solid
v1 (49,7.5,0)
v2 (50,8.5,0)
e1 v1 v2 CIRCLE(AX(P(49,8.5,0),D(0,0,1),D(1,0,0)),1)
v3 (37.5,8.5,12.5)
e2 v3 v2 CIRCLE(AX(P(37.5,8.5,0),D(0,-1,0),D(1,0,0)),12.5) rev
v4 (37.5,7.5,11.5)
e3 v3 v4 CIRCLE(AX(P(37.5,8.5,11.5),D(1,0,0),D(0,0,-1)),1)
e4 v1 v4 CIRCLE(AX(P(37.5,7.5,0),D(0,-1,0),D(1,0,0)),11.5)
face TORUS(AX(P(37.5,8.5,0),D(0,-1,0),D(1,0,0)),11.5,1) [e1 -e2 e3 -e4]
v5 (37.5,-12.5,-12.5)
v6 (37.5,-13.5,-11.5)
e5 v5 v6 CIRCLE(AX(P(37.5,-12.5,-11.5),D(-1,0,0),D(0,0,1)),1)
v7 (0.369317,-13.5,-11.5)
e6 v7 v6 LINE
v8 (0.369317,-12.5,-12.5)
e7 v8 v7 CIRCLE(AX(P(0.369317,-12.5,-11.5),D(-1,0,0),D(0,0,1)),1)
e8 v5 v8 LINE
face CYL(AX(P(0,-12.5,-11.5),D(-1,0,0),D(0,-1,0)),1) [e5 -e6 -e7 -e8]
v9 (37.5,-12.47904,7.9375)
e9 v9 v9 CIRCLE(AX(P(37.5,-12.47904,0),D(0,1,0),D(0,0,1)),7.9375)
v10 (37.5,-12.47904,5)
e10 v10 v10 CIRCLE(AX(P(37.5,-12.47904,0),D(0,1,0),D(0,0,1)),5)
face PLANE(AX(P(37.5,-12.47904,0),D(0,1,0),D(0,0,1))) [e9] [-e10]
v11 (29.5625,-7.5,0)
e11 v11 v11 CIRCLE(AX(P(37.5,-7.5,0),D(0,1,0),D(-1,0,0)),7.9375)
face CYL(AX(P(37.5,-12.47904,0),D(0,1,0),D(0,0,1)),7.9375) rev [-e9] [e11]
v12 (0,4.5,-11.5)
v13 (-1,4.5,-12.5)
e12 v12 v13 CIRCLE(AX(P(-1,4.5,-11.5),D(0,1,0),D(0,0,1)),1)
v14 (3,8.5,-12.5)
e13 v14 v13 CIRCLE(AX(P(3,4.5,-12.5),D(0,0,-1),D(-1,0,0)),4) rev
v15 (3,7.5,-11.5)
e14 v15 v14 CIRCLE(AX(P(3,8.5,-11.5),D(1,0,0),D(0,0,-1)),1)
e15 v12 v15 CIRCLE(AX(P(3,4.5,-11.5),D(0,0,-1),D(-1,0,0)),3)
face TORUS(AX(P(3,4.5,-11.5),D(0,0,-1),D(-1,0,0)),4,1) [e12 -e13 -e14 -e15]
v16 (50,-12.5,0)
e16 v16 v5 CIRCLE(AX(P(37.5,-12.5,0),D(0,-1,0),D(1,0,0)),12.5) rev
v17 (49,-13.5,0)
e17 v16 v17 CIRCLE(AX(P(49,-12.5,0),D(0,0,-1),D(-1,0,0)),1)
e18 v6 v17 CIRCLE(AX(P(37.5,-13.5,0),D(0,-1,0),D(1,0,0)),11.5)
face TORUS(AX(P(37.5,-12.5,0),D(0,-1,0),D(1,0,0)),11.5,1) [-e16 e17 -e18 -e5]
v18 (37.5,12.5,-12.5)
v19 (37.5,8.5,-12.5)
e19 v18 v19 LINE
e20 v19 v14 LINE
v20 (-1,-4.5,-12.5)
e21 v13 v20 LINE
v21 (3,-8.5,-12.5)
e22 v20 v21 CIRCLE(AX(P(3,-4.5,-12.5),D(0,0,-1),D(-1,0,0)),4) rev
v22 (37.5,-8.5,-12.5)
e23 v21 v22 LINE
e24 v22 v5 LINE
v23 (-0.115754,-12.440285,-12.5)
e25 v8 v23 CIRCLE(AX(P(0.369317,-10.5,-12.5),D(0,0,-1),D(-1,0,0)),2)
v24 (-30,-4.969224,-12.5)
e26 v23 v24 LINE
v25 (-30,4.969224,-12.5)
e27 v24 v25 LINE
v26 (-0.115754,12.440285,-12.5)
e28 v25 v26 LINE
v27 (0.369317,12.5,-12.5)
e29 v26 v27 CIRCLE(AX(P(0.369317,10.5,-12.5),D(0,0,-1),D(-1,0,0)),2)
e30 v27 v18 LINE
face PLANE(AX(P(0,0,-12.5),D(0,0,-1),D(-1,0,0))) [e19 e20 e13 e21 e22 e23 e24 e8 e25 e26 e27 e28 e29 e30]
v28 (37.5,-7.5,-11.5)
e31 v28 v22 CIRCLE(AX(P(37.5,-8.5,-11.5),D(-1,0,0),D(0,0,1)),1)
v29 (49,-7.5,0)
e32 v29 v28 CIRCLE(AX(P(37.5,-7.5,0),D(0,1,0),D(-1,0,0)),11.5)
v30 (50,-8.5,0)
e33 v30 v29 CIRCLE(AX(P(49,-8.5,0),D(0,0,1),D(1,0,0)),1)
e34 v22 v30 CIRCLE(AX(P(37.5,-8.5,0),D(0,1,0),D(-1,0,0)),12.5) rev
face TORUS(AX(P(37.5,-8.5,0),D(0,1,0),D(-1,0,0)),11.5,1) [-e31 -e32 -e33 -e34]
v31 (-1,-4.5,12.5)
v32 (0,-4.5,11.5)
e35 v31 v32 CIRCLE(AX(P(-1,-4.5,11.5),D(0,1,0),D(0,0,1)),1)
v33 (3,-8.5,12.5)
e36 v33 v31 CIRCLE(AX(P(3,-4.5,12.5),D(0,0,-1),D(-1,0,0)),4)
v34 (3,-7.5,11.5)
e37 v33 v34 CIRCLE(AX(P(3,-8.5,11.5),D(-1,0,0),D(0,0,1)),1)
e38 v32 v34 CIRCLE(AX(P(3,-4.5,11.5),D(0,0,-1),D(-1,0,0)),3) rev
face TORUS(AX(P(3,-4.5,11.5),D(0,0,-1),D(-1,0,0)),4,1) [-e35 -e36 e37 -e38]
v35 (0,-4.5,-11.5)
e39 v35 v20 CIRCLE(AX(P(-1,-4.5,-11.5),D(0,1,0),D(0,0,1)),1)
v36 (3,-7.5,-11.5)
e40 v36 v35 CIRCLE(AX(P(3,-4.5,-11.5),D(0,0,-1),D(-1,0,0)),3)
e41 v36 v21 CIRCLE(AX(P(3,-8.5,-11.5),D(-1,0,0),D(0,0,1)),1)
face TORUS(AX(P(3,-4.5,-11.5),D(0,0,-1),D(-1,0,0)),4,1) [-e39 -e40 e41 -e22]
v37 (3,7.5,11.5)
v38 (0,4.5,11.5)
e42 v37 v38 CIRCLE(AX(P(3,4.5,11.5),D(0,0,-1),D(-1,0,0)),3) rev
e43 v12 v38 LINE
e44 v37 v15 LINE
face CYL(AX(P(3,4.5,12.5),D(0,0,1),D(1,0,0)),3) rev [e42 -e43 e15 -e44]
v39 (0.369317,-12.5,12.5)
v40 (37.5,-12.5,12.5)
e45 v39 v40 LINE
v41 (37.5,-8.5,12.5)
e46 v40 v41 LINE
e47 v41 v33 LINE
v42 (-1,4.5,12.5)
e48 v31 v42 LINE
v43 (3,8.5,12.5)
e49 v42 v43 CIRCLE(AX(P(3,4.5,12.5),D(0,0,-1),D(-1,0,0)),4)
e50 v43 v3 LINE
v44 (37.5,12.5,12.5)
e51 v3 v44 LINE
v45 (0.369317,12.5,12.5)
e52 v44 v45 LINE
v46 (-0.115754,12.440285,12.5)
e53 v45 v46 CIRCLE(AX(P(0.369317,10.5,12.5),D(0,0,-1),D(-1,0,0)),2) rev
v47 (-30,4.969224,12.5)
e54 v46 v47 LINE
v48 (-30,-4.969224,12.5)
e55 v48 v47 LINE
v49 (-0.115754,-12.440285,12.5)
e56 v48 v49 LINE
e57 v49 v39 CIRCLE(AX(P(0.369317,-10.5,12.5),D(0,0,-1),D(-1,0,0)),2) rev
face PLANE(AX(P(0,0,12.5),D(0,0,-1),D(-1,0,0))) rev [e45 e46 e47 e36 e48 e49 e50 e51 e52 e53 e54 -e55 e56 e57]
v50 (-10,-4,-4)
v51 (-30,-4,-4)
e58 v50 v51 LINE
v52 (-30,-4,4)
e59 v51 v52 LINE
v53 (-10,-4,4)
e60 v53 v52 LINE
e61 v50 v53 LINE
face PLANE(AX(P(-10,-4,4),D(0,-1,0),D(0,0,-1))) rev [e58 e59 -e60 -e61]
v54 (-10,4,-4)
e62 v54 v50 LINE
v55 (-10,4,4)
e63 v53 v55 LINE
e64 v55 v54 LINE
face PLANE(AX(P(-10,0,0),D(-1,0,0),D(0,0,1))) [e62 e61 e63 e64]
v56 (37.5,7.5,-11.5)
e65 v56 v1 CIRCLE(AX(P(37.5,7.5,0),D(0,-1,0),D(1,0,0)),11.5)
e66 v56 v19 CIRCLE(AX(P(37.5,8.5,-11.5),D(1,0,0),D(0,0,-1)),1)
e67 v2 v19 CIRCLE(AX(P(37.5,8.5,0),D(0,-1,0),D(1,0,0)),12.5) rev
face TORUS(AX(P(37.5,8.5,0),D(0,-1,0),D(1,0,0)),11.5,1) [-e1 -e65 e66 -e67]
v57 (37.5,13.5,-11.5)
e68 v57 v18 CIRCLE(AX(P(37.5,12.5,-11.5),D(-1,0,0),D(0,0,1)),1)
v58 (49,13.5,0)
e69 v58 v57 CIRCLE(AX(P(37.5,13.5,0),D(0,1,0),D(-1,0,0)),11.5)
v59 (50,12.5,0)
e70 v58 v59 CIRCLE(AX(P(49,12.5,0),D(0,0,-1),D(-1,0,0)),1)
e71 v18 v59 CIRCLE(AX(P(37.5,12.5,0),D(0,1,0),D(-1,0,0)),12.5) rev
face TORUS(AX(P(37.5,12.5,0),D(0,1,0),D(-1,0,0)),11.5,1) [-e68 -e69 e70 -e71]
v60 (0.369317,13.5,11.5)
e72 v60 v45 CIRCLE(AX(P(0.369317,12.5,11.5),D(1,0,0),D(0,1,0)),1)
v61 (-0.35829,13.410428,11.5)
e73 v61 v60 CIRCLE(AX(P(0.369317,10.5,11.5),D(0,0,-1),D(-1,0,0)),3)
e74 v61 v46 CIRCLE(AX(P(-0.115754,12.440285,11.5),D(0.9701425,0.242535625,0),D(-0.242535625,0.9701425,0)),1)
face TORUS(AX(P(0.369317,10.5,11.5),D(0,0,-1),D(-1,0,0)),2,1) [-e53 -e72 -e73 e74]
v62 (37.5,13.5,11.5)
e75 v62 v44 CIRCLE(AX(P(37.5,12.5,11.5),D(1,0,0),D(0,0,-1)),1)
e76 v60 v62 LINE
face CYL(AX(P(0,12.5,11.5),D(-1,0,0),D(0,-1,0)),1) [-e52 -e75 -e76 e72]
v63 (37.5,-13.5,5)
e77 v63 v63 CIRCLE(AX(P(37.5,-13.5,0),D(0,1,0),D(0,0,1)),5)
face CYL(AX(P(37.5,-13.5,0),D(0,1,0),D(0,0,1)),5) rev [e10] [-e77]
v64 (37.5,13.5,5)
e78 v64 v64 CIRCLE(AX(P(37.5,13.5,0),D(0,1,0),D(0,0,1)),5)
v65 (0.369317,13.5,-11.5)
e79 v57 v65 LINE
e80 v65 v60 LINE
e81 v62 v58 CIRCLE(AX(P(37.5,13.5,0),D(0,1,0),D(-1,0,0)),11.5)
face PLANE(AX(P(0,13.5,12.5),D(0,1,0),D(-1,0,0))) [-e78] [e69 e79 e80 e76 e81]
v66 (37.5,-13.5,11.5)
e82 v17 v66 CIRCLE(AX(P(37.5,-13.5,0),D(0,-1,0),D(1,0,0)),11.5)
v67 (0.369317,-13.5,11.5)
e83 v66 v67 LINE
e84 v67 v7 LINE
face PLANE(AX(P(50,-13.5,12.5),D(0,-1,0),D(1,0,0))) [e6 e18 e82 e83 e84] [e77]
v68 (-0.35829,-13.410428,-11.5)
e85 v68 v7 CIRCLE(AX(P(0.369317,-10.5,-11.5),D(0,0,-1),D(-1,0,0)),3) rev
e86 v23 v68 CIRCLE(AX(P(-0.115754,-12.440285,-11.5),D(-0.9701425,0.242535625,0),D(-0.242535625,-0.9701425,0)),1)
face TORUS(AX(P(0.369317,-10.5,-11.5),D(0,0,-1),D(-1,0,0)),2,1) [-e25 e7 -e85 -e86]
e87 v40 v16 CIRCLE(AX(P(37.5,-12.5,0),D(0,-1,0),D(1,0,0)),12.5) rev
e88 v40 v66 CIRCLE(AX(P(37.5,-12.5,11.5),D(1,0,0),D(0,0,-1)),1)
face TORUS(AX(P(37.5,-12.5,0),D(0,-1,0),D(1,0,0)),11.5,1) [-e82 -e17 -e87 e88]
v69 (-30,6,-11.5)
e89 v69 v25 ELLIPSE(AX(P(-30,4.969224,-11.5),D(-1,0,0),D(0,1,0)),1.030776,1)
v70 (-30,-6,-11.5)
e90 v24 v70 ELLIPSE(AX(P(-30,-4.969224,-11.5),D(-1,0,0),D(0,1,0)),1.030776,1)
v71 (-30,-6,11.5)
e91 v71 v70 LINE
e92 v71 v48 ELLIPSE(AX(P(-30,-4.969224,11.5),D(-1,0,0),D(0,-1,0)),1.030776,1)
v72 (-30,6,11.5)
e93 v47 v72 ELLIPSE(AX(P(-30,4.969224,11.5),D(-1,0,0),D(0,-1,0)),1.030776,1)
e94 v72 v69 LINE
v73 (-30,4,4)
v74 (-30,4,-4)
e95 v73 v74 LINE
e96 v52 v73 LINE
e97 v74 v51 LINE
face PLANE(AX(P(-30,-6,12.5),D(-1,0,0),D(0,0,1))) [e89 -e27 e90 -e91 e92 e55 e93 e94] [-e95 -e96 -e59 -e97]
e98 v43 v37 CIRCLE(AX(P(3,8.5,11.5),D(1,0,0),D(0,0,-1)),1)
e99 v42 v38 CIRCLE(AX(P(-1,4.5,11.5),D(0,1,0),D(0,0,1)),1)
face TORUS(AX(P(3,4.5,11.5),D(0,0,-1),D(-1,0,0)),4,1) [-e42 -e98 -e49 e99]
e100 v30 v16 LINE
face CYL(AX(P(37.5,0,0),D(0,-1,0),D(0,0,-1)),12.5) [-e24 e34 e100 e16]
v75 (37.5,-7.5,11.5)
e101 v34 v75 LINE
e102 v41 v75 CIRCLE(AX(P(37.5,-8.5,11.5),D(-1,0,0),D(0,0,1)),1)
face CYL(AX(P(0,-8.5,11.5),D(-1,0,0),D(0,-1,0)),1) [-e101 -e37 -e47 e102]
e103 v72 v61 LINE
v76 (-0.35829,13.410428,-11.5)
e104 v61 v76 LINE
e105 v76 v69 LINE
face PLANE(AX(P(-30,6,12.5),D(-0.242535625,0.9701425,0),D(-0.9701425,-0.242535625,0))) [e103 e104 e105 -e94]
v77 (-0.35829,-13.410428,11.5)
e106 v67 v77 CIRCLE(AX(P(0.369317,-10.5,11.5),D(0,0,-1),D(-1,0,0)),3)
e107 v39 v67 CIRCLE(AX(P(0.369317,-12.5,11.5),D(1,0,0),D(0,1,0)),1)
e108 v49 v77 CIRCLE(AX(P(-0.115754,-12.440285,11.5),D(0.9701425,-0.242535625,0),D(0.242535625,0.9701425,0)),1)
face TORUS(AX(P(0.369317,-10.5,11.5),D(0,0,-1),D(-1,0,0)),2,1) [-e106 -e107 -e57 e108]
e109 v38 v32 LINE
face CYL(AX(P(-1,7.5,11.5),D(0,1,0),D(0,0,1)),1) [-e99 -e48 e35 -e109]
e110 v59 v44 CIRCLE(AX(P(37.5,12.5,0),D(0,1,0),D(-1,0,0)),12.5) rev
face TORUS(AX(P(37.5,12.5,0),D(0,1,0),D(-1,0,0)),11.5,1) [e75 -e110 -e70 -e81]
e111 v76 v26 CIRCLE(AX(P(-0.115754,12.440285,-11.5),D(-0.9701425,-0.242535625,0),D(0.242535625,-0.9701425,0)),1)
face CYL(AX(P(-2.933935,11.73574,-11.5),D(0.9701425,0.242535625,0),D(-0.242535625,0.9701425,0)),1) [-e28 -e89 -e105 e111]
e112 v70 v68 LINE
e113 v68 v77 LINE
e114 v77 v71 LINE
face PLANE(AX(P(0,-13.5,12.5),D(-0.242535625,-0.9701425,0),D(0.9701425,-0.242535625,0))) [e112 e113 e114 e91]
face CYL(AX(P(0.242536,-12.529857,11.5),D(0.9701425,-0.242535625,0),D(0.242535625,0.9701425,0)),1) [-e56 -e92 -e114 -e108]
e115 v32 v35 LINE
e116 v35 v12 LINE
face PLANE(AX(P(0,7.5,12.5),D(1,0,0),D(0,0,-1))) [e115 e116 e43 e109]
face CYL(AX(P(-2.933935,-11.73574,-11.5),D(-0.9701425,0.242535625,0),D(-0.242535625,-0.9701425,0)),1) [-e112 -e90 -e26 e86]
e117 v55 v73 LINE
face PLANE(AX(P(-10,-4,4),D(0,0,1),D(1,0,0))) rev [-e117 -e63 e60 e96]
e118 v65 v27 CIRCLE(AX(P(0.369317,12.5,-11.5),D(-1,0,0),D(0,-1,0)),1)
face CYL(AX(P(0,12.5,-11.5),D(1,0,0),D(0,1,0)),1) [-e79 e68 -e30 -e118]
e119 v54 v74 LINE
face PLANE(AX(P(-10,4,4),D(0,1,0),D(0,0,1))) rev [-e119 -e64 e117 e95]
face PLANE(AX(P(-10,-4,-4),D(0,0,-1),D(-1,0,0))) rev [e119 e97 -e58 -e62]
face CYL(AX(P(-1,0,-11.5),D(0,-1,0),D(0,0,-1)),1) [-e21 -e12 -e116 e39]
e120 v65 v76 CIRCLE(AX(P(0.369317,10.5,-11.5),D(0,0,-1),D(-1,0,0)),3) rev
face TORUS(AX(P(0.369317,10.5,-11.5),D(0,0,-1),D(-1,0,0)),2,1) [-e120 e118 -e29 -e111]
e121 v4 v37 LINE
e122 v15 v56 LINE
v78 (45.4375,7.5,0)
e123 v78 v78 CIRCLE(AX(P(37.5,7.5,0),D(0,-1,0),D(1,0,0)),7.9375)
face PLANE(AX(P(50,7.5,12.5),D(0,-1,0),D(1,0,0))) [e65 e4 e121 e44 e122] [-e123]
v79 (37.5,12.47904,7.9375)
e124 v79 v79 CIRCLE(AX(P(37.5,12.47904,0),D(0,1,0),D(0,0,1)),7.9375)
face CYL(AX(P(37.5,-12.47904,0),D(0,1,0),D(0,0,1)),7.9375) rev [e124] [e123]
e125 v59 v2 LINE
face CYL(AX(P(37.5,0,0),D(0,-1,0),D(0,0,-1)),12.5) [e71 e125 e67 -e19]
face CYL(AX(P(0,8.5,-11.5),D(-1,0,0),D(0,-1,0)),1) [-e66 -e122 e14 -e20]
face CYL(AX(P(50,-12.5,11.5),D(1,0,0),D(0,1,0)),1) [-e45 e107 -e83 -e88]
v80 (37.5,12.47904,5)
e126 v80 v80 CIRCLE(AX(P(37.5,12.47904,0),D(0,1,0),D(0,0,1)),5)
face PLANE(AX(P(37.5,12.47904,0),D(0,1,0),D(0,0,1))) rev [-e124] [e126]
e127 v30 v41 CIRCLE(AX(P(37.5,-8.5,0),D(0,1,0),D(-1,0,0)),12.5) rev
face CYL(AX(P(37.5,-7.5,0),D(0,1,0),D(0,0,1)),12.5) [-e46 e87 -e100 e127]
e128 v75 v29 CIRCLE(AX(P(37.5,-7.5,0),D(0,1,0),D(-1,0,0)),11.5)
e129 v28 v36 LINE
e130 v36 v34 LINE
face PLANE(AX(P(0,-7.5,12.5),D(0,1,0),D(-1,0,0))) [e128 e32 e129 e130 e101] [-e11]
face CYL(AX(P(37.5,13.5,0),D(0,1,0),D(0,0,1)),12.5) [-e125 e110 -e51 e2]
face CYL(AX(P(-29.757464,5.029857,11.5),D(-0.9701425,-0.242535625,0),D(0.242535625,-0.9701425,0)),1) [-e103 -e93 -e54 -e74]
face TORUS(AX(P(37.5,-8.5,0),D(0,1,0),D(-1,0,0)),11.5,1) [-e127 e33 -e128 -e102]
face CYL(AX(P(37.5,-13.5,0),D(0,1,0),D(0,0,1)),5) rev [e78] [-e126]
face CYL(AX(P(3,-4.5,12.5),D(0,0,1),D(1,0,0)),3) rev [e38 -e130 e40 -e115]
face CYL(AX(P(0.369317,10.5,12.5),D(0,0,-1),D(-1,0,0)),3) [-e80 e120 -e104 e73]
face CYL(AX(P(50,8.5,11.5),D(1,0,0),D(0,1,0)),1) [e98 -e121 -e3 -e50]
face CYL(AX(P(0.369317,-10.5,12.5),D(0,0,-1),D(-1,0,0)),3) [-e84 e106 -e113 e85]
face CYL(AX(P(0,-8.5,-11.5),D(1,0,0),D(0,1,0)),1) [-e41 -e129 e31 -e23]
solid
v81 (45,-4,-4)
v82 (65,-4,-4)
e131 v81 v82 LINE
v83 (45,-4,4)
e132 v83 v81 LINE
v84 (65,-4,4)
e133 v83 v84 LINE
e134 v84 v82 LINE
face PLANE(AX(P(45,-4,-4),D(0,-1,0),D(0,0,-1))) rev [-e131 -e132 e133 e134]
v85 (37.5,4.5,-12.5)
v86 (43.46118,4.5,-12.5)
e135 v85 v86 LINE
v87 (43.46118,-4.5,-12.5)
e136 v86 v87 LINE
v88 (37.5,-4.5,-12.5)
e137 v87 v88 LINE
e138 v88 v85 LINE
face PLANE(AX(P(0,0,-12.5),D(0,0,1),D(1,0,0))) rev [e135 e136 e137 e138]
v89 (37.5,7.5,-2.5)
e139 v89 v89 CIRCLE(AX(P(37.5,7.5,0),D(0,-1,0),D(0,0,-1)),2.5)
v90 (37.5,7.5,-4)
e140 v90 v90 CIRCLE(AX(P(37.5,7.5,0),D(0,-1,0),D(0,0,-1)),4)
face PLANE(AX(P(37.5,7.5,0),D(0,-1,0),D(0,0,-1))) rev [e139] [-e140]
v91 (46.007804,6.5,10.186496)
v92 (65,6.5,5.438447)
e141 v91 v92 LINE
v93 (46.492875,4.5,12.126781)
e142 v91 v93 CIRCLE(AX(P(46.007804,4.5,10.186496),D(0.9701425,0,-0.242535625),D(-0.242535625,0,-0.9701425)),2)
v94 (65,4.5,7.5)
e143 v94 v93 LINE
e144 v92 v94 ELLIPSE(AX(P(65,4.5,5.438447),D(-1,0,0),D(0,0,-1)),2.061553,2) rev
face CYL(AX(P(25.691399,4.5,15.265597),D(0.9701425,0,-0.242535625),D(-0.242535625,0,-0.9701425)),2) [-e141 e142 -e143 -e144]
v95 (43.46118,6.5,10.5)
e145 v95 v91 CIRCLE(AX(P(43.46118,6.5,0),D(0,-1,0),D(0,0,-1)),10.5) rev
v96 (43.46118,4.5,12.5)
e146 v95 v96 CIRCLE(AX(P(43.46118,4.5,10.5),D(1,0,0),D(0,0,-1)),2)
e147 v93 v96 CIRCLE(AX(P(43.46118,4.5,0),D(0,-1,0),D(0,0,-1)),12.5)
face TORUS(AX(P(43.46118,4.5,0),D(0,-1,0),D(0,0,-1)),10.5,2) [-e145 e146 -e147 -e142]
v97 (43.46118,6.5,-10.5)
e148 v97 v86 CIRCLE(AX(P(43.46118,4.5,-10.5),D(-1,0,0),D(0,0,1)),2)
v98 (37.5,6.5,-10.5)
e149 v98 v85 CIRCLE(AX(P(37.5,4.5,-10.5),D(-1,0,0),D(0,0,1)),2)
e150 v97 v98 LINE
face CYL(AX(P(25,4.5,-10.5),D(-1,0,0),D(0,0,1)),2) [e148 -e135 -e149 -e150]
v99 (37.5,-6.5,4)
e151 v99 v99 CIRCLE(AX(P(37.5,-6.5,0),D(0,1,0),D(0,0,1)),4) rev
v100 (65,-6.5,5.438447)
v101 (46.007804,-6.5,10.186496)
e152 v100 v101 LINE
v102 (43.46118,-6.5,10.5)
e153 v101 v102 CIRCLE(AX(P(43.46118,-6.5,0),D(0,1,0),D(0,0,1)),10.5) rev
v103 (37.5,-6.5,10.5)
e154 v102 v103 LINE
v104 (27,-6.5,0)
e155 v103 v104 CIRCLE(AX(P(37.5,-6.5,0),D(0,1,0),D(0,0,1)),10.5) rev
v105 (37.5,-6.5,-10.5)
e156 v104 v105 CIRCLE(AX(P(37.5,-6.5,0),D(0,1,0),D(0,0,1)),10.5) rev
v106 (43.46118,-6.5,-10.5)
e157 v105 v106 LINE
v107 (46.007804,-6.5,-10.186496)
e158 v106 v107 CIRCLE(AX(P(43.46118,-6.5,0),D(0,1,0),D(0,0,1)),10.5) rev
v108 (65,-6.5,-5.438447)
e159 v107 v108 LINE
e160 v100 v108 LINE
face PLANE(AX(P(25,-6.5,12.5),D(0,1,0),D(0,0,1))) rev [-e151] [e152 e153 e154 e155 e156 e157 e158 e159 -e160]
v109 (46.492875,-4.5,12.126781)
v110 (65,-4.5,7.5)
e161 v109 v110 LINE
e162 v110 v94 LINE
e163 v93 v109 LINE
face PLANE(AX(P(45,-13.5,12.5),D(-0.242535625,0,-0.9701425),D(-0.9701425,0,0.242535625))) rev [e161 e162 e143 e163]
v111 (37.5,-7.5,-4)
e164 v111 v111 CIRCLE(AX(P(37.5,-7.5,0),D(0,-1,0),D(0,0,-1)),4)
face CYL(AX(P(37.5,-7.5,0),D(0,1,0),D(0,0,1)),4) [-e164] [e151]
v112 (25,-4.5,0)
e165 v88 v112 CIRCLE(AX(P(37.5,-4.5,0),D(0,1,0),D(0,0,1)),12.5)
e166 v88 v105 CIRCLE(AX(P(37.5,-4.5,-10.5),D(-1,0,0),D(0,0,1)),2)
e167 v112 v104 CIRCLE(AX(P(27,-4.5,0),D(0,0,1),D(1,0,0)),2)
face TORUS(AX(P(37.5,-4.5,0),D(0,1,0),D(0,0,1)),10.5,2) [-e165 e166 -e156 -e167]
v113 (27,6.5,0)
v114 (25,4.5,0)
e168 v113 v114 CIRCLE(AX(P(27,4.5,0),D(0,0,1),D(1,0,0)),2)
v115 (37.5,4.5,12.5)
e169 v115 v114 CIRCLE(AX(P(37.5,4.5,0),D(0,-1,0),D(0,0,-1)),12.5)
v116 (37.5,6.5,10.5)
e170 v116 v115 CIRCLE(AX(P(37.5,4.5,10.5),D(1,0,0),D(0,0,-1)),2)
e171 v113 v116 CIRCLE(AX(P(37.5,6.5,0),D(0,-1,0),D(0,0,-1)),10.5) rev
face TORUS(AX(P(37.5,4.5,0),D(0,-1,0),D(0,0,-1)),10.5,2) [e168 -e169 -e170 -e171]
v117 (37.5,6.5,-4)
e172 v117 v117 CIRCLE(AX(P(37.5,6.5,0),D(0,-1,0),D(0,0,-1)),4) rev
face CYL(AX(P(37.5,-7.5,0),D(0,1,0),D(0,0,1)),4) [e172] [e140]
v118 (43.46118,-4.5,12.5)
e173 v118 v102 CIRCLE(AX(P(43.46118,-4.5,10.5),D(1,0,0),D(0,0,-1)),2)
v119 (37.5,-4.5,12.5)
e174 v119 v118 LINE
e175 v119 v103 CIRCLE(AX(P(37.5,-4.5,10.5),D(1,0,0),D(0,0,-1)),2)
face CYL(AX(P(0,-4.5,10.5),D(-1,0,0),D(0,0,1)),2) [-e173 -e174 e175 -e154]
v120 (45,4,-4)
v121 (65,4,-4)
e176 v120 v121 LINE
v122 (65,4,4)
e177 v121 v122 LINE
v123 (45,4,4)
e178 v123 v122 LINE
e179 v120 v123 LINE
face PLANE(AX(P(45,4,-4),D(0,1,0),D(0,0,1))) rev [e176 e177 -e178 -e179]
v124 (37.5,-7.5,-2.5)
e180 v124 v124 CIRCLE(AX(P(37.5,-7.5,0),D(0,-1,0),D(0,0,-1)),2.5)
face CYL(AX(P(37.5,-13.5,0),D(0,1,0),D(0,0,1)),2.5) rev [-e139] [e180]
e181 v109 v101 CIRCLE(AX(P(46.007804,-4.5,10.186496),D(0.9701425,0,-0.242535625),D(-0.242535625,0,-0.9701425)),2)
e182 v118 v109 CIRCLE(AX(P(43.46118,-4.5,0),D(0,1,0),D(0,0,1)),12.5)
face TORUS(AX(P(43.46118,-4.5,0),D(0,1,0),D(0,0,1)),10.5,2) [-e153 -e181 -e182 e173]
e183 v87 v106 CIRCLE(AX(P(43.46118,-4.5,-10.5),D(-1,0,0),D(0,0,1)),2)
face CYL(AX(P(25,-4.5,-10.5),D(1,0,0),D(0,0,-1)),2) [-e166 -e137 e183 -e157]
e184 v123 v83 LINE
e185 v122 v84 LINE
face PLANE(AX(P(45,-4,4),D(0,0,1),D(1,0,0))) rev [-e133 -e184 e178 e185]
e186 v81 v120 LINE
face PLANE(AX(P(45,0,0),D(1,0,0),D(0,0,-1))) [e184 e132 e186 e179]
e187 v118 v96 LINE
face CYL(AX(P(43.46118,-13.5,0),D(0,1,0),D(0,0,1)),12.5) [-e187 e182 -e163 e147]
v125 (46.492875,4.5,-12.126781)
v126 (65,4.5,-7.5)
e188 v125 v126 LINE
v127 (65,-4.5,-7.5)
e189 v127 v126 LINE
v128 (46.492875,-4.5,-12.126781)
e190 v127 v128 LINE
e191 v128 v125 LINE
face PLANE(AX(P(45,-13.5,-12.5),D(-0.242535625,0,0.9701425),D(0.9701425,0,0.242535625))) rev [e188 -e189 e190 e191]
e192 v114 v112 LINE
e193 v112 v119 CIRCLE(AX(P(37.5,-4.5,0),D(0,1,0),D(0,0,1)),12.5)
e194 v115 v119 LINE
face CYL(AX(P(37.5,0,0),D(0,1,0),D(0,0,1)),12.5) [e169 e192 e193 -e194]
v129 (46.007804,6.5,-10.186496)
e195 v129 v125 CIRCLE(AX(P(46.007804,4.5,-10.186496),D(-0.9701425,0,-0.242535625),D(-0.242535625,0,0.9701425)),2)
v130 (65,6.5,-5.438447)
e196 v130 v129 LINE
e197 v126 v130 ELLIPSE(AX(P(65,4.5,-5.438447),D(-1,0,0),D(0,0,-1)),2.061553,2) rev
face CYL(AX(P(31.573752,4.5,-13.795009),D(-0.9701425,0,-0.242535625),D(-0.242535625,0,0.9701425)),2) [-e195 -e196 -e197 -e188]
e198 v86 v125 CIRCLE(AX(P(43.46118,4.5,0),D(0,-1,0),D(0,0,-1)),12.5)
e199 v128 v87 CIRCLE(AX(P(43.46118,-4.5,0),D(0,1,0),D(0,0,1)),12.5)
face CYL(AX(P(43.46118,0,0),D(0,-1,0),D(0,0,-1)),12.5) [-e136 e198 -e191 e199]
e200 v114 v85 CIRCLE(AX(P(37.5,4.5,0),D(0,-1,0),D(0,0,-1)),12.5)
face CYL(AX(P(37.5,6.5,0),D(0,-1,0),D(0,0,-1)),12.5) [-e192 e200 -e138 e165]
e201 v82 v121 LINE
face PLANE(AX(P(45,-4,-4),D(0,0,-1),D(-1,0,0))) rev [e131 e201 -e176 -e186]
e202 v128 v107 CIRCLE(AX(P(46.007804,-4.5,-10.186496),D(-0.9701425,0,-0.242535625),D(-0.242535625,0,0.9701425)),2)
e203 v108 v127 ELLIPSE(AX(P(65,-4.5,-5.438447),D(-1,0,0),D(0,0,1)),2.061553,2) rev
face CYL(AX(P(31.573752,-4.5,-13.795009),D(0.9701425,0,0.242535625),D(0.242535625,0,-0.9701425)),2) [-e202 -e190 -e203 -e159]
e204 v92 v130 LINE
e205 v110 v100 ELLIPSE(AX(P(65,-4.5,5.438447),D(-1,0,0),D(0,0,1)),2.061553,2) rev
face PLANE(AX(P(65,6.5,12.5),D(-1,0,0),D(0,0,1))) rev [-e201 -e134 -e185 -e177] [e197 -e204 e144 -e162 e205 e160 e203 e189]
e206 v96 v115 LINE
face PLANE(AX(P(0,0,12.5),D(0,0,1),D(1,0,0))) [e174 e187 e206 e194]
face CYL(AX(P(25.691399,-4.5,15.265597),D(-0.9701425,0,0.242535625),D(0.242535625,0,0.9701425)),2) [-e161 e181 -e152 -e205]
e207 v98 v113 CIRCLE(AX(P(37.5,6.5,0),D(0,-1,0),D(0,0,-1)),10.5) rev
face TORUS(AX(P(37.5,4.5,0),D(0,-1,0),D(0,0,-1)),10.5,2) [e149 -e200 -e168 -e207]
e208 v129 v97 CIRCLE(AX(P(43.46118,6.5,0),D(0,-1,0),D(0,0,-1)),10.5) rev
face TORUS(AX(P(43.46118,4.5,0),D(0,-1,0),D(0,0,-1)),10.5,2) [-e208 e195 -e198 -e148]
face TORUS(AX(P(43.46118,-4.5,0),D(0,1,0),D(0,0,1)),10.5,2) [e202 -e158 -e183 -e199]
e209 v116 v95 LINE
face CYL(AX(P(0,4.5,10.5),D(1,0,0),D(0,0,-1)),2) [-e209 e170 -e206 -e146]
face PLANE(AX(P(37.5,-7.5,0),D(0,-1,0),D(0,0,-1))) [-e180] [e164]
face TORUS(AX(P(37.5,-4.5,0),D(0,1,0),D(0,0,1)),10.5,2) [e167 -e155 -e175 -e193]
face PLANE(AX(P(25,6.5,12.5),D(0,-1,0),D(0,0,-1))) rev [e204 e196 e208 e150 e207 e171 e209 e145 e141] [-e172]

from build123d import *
from build123d.topology import SkipClean

# Parameters (mm, degrees)
BOSS_EXTRUDE1_DEPTH     = 12.5
FILLET1_R               = 12.5
FILLET2_R               = 3
SKETCH2_W               = 8
SKETCH2_H               = 8
CUT_EXTRUDE1_DEPTH      = 20
SKETCH3_R               = 7.9375
CUT_EXTRUDE2_DEPTH      = 12.47904
CUT_EXTRUDE3_DEPTH      = 54.27757502
CUT_EXTRUDE3_DEPTH_BACK = 54.27757502
SKETCH4_R               = 5
SKETCH5_W               = 40
SKETCH5_H               = 13
BOSS_EXTRUDE2_DEPTH     = 12.5
FILLET4_R               = 12.5
CUT_EXTRUDE4_DEPTH      = 70.14658343
CUT_EXTRUDE4_DEPTH_BACK = 70.14658343
SKETCH7_R               = 2.5
SKETCH9_W               = 8
SKETCH9_H               = 8
CUT_EXTRUDE5_DEPTH      = 20
SKETCH10_R              = 4
SKETCH10_R_2            = 2.5
BOSS_EXTRUDE3_DEPTH     = 7.5
FILLET5_R               = 12.5
FILLET6_R               = 2
FILLET3_R               = 1


with BuildPart() as part:
    # Sketch1 → Boss-Extrude1 (new, symmetric)
    with BuildSketch(Plane.XY):
        Polygon((0, 13.5), (50, 13.5), (50, 7.5), (0, 7.5), (0, -7.5), (50, -7.5), (50, -13.5), (0, -13.5), (-30, -6), (-30, 6), align=None)
    extrude(amount=BOSS_EXTRUDE1_DEPTH, both=True)

    # Fillet1
    fillet1_edges = [part.edges().sort_by_distance(p)[0] for p in [
        (50, -10.5, -12.5),
        (50, -10.5, 12.5),
        (50, 10.5, -12.5),
        (50, 10.5, 12.5),
    ]]
    fillet(fillet1_edges, radius=FILLET1_R - 0.0001)  # a hair under: the kernel refuses the full size

    # Fillet2
    fillet2_edges = [part.edges().sort_by_distance(p)[0] for p in [
        (0, -13.5, 0),
        (0, -7.5, 0),
        (0, 7.5, 0),
        (0, 13.5, 0),
    ]]
    fillet(fillet2_edges, radius=FILLET2_R)

    # Sketch2 → Cut-Extrude1 (cut)
    with BuildSketch(Plane.ZY.offset(30)):
        Rectangle(SKETCH2_W, SKETCH2_H)
    extrude(amount=-CUT_EXTRUDE1_DEPTH, mode=Mode.SUBTRACT)

    # Sketch3 → Cut-Extrude2 (cut, symmetric)
    with BuildSketch(Plane(origin=(0, 0, 0), x_dir=(1, 0, 0), z_dir=(0, 1, 0))):
        with Locations(Location((37.5, 0, 0), (0, 0, 270))):
            Circle(SKETCH3_R)
    extrude(amount=CUT_EXTRUDE2_DEPTH, both=True, mode=Mode.SUBTRACT)

    # Sketch4 → Cut-Extrude3 (cut, two sides: drawn at the far end of the back side and taken through both)
    with BuildSketch(Plane(origin=(0, 0, 0), x_dir=(1, 0, 0), z_dir=(0, 1, 0)).offset(-CUT_EXTRUDE3_DEPTH_BACK)):
        with Locations(Location((37.5, 0, 0), (0, 0, 270))):
            Circle(SKETCH4_R)
    extrude(amount=CUT_EXTRUDE3_DEPTH + CUT_EXTRUDE3_DEPTH_BACK, mode=Mode.SUBTRACT)

    # Fillet3
    fillet3_edges = [part.edges().sort_by_distance(p)[0] for p in [
        (-15.179144999, 9.70521375, -12.5),
        (20.25005, 7.5, -12.5),
        (18.934708438, -13.5, -12.5),
        (18.934708438, -13.5, 12.5),
        (46.338864054, -13.5, 8.838864054),
        (46.338864054, -13.5, -8.838864054),
        (46.338864054, -7.5, 8.838864054),
        (46.338864054, -7.5, -8.838864054),
        (20.25005, 7.5, 12.5),
        (46.338864054, 7.5, 8.838864054),
        (46.338864054, 7.5, -8.838864054),
        (46.338864054, 13.5, 8.838864054),
        (46.338864054, 13.5, -8.838864054),
        (20.25005, -7.5, -12.5),
        (-15.179144999, -9.70521375, -12.5),
        (18.934708438, 13.5, -12.5),
        (0, 0, -12.5),
        (0.002767086, 13.47752267, -12.5),
        (0.002767086, -13.47752267, -12.5),
        (-15.179144999, -9.70521375, 12.5),
        (20.25005, -7.5, 12.5),
        (0, 0, 12.5),
        (18.934708438, 13.5, 12.5),
        (0.002767086, 13.47752267, 12.5),
        (0.002767086, -13.47752267, 12.5),
        (0.878679656, -6.621320344, -12.5),
        (0.878679656, -6.621320344, 12.5),
        (0.878679656, 6.621320344, -12.5),
        (0.878679656, 6.621320344, 12.5),
        (-15.179144999, 9.70521375, 12.5),
    ]]
    fillet(fillet3_edges, radius=FILLET3_R)


with BuildPart() as body_2:
    # Sketch5 → Boss-Extrude2 (new, symmetric)
    with BuildSketch(Plane.XY):
        with Locations((45, 0)):
            Rectangle(SKETCH5_W, SKETCH5_H)
    extrude(amount=BOSS_EXTRUDE2_DEPTH, both=True)

    # Fillet4
    fillet4_edges = [body_2.edges().sort_by_distance(p)[0] for p in [
        (25, 0, 12.5),
        (25, 0, -12.5),
    ]]
    fillet(fillet4_edges, radius=FILLET4_R - 0.0001)  # a hair under: the kernel refuses the full size

    # Sketch7 → Cut-Extrude4 (cut, two sides: drawn at the far end of the back side and taken through both)
    with BuildSketch(Plane(origin=(0, 6.5, 0), x_dir=(1, 0, 0), z_dir=(0, 1, 0)).offset(-CUT_EXTRUDE4_DEPTH_BACK)):
        with Locations(Location((37.5, 0, 0), (0, 0, 270))):
            Circle(SKETCH7_R)
        Polygon((45, 12.5), (65, 7.5), (65, 12.5), align=None)
        Polygon((65, -7.5), (65, -12.5), (45, -12.5), align=None)
    extrude(amount=CUT_EXTRUDE4_DEPTH + CUT_EXTRUDE4_DEPTH_BACK, mode=Mode.SUBTRACT)

    # Sketch9 → Cut-Extrude5 (cut)
    with BuildSketch(Plane(origin=(65, 0, 0), x_dir=(0, 0, -1), z_dir=(1, 0, 0))):
        Rectangle(SKETCH9_W, SKETCH9_H)
    extrude(amount=-CUT_EXTRUDE5_DEPTH, mode=Mode.SUBTRACT)

    # Sketch10 → Boss-Extrude3 (add, symmetric)
    with SkipClean():  # the faces are left unmerged after this step: merging them gives an invalid solid
        with BuildSketch(Plane.XZ):
            with Locations(Location((37.5, 0, 0), (0, 0, 270))):
                Circle(SKETCH10_R)
            with Locations(Location((37.5, 0, 0), (0, 0, 270))):
                Circle(SKETCH10_R_2, mode=Mode.SUBTRACT)
        extrude(amount=BOSS_EXTRUDE3_DEPTH, both=True)

    # Fillet5
    fillet5_edges = [body_2.edges().sort_by_distance(p)[0] for p in [
        (45, 0, -12.5),
        (45, 0, 12.5),
    ]]
    fillet(fillet5_edges, radius=FILLET5_R)

    # Fillet6
    fillet6_edges = [body_2.edges().sort_by_distance(p)[0] for p in [
        (40.48053984, -6.5, 12.5),
        (40.48053984, -6.5, -12.5),
        (28.661135946, -6.5, -8.838864054),
        (28.661135946, -6.5, 8.838864054),
        (28.661135946, 6.5, -8.838864054),
        (28.661135946, 6.5, 8.838864054),
        (55.746437496, 6.5, -9.813390626),
        (55.746437496, -6.5, 9.813390626),
        (55.746437496, 6.5, 9.813390626),
        (55.746437496, -6.5, -9.813390626),
        (44.988470476, -6.5, -12.406344459),
        (44.988470476, -6.5, 12.406344459),
        (40.48053984, 6.5, 12.5),
        (40.48053984, 6.5, -12.5),
        (44.988470476, 6.5, -12.406344459),
        (44.988470476, 6.5, 12.406344459),
    ]]
    fillet(fillet6_edges, radius=FILLET6_R)


solid = Compound([part.part, body_2.part])
